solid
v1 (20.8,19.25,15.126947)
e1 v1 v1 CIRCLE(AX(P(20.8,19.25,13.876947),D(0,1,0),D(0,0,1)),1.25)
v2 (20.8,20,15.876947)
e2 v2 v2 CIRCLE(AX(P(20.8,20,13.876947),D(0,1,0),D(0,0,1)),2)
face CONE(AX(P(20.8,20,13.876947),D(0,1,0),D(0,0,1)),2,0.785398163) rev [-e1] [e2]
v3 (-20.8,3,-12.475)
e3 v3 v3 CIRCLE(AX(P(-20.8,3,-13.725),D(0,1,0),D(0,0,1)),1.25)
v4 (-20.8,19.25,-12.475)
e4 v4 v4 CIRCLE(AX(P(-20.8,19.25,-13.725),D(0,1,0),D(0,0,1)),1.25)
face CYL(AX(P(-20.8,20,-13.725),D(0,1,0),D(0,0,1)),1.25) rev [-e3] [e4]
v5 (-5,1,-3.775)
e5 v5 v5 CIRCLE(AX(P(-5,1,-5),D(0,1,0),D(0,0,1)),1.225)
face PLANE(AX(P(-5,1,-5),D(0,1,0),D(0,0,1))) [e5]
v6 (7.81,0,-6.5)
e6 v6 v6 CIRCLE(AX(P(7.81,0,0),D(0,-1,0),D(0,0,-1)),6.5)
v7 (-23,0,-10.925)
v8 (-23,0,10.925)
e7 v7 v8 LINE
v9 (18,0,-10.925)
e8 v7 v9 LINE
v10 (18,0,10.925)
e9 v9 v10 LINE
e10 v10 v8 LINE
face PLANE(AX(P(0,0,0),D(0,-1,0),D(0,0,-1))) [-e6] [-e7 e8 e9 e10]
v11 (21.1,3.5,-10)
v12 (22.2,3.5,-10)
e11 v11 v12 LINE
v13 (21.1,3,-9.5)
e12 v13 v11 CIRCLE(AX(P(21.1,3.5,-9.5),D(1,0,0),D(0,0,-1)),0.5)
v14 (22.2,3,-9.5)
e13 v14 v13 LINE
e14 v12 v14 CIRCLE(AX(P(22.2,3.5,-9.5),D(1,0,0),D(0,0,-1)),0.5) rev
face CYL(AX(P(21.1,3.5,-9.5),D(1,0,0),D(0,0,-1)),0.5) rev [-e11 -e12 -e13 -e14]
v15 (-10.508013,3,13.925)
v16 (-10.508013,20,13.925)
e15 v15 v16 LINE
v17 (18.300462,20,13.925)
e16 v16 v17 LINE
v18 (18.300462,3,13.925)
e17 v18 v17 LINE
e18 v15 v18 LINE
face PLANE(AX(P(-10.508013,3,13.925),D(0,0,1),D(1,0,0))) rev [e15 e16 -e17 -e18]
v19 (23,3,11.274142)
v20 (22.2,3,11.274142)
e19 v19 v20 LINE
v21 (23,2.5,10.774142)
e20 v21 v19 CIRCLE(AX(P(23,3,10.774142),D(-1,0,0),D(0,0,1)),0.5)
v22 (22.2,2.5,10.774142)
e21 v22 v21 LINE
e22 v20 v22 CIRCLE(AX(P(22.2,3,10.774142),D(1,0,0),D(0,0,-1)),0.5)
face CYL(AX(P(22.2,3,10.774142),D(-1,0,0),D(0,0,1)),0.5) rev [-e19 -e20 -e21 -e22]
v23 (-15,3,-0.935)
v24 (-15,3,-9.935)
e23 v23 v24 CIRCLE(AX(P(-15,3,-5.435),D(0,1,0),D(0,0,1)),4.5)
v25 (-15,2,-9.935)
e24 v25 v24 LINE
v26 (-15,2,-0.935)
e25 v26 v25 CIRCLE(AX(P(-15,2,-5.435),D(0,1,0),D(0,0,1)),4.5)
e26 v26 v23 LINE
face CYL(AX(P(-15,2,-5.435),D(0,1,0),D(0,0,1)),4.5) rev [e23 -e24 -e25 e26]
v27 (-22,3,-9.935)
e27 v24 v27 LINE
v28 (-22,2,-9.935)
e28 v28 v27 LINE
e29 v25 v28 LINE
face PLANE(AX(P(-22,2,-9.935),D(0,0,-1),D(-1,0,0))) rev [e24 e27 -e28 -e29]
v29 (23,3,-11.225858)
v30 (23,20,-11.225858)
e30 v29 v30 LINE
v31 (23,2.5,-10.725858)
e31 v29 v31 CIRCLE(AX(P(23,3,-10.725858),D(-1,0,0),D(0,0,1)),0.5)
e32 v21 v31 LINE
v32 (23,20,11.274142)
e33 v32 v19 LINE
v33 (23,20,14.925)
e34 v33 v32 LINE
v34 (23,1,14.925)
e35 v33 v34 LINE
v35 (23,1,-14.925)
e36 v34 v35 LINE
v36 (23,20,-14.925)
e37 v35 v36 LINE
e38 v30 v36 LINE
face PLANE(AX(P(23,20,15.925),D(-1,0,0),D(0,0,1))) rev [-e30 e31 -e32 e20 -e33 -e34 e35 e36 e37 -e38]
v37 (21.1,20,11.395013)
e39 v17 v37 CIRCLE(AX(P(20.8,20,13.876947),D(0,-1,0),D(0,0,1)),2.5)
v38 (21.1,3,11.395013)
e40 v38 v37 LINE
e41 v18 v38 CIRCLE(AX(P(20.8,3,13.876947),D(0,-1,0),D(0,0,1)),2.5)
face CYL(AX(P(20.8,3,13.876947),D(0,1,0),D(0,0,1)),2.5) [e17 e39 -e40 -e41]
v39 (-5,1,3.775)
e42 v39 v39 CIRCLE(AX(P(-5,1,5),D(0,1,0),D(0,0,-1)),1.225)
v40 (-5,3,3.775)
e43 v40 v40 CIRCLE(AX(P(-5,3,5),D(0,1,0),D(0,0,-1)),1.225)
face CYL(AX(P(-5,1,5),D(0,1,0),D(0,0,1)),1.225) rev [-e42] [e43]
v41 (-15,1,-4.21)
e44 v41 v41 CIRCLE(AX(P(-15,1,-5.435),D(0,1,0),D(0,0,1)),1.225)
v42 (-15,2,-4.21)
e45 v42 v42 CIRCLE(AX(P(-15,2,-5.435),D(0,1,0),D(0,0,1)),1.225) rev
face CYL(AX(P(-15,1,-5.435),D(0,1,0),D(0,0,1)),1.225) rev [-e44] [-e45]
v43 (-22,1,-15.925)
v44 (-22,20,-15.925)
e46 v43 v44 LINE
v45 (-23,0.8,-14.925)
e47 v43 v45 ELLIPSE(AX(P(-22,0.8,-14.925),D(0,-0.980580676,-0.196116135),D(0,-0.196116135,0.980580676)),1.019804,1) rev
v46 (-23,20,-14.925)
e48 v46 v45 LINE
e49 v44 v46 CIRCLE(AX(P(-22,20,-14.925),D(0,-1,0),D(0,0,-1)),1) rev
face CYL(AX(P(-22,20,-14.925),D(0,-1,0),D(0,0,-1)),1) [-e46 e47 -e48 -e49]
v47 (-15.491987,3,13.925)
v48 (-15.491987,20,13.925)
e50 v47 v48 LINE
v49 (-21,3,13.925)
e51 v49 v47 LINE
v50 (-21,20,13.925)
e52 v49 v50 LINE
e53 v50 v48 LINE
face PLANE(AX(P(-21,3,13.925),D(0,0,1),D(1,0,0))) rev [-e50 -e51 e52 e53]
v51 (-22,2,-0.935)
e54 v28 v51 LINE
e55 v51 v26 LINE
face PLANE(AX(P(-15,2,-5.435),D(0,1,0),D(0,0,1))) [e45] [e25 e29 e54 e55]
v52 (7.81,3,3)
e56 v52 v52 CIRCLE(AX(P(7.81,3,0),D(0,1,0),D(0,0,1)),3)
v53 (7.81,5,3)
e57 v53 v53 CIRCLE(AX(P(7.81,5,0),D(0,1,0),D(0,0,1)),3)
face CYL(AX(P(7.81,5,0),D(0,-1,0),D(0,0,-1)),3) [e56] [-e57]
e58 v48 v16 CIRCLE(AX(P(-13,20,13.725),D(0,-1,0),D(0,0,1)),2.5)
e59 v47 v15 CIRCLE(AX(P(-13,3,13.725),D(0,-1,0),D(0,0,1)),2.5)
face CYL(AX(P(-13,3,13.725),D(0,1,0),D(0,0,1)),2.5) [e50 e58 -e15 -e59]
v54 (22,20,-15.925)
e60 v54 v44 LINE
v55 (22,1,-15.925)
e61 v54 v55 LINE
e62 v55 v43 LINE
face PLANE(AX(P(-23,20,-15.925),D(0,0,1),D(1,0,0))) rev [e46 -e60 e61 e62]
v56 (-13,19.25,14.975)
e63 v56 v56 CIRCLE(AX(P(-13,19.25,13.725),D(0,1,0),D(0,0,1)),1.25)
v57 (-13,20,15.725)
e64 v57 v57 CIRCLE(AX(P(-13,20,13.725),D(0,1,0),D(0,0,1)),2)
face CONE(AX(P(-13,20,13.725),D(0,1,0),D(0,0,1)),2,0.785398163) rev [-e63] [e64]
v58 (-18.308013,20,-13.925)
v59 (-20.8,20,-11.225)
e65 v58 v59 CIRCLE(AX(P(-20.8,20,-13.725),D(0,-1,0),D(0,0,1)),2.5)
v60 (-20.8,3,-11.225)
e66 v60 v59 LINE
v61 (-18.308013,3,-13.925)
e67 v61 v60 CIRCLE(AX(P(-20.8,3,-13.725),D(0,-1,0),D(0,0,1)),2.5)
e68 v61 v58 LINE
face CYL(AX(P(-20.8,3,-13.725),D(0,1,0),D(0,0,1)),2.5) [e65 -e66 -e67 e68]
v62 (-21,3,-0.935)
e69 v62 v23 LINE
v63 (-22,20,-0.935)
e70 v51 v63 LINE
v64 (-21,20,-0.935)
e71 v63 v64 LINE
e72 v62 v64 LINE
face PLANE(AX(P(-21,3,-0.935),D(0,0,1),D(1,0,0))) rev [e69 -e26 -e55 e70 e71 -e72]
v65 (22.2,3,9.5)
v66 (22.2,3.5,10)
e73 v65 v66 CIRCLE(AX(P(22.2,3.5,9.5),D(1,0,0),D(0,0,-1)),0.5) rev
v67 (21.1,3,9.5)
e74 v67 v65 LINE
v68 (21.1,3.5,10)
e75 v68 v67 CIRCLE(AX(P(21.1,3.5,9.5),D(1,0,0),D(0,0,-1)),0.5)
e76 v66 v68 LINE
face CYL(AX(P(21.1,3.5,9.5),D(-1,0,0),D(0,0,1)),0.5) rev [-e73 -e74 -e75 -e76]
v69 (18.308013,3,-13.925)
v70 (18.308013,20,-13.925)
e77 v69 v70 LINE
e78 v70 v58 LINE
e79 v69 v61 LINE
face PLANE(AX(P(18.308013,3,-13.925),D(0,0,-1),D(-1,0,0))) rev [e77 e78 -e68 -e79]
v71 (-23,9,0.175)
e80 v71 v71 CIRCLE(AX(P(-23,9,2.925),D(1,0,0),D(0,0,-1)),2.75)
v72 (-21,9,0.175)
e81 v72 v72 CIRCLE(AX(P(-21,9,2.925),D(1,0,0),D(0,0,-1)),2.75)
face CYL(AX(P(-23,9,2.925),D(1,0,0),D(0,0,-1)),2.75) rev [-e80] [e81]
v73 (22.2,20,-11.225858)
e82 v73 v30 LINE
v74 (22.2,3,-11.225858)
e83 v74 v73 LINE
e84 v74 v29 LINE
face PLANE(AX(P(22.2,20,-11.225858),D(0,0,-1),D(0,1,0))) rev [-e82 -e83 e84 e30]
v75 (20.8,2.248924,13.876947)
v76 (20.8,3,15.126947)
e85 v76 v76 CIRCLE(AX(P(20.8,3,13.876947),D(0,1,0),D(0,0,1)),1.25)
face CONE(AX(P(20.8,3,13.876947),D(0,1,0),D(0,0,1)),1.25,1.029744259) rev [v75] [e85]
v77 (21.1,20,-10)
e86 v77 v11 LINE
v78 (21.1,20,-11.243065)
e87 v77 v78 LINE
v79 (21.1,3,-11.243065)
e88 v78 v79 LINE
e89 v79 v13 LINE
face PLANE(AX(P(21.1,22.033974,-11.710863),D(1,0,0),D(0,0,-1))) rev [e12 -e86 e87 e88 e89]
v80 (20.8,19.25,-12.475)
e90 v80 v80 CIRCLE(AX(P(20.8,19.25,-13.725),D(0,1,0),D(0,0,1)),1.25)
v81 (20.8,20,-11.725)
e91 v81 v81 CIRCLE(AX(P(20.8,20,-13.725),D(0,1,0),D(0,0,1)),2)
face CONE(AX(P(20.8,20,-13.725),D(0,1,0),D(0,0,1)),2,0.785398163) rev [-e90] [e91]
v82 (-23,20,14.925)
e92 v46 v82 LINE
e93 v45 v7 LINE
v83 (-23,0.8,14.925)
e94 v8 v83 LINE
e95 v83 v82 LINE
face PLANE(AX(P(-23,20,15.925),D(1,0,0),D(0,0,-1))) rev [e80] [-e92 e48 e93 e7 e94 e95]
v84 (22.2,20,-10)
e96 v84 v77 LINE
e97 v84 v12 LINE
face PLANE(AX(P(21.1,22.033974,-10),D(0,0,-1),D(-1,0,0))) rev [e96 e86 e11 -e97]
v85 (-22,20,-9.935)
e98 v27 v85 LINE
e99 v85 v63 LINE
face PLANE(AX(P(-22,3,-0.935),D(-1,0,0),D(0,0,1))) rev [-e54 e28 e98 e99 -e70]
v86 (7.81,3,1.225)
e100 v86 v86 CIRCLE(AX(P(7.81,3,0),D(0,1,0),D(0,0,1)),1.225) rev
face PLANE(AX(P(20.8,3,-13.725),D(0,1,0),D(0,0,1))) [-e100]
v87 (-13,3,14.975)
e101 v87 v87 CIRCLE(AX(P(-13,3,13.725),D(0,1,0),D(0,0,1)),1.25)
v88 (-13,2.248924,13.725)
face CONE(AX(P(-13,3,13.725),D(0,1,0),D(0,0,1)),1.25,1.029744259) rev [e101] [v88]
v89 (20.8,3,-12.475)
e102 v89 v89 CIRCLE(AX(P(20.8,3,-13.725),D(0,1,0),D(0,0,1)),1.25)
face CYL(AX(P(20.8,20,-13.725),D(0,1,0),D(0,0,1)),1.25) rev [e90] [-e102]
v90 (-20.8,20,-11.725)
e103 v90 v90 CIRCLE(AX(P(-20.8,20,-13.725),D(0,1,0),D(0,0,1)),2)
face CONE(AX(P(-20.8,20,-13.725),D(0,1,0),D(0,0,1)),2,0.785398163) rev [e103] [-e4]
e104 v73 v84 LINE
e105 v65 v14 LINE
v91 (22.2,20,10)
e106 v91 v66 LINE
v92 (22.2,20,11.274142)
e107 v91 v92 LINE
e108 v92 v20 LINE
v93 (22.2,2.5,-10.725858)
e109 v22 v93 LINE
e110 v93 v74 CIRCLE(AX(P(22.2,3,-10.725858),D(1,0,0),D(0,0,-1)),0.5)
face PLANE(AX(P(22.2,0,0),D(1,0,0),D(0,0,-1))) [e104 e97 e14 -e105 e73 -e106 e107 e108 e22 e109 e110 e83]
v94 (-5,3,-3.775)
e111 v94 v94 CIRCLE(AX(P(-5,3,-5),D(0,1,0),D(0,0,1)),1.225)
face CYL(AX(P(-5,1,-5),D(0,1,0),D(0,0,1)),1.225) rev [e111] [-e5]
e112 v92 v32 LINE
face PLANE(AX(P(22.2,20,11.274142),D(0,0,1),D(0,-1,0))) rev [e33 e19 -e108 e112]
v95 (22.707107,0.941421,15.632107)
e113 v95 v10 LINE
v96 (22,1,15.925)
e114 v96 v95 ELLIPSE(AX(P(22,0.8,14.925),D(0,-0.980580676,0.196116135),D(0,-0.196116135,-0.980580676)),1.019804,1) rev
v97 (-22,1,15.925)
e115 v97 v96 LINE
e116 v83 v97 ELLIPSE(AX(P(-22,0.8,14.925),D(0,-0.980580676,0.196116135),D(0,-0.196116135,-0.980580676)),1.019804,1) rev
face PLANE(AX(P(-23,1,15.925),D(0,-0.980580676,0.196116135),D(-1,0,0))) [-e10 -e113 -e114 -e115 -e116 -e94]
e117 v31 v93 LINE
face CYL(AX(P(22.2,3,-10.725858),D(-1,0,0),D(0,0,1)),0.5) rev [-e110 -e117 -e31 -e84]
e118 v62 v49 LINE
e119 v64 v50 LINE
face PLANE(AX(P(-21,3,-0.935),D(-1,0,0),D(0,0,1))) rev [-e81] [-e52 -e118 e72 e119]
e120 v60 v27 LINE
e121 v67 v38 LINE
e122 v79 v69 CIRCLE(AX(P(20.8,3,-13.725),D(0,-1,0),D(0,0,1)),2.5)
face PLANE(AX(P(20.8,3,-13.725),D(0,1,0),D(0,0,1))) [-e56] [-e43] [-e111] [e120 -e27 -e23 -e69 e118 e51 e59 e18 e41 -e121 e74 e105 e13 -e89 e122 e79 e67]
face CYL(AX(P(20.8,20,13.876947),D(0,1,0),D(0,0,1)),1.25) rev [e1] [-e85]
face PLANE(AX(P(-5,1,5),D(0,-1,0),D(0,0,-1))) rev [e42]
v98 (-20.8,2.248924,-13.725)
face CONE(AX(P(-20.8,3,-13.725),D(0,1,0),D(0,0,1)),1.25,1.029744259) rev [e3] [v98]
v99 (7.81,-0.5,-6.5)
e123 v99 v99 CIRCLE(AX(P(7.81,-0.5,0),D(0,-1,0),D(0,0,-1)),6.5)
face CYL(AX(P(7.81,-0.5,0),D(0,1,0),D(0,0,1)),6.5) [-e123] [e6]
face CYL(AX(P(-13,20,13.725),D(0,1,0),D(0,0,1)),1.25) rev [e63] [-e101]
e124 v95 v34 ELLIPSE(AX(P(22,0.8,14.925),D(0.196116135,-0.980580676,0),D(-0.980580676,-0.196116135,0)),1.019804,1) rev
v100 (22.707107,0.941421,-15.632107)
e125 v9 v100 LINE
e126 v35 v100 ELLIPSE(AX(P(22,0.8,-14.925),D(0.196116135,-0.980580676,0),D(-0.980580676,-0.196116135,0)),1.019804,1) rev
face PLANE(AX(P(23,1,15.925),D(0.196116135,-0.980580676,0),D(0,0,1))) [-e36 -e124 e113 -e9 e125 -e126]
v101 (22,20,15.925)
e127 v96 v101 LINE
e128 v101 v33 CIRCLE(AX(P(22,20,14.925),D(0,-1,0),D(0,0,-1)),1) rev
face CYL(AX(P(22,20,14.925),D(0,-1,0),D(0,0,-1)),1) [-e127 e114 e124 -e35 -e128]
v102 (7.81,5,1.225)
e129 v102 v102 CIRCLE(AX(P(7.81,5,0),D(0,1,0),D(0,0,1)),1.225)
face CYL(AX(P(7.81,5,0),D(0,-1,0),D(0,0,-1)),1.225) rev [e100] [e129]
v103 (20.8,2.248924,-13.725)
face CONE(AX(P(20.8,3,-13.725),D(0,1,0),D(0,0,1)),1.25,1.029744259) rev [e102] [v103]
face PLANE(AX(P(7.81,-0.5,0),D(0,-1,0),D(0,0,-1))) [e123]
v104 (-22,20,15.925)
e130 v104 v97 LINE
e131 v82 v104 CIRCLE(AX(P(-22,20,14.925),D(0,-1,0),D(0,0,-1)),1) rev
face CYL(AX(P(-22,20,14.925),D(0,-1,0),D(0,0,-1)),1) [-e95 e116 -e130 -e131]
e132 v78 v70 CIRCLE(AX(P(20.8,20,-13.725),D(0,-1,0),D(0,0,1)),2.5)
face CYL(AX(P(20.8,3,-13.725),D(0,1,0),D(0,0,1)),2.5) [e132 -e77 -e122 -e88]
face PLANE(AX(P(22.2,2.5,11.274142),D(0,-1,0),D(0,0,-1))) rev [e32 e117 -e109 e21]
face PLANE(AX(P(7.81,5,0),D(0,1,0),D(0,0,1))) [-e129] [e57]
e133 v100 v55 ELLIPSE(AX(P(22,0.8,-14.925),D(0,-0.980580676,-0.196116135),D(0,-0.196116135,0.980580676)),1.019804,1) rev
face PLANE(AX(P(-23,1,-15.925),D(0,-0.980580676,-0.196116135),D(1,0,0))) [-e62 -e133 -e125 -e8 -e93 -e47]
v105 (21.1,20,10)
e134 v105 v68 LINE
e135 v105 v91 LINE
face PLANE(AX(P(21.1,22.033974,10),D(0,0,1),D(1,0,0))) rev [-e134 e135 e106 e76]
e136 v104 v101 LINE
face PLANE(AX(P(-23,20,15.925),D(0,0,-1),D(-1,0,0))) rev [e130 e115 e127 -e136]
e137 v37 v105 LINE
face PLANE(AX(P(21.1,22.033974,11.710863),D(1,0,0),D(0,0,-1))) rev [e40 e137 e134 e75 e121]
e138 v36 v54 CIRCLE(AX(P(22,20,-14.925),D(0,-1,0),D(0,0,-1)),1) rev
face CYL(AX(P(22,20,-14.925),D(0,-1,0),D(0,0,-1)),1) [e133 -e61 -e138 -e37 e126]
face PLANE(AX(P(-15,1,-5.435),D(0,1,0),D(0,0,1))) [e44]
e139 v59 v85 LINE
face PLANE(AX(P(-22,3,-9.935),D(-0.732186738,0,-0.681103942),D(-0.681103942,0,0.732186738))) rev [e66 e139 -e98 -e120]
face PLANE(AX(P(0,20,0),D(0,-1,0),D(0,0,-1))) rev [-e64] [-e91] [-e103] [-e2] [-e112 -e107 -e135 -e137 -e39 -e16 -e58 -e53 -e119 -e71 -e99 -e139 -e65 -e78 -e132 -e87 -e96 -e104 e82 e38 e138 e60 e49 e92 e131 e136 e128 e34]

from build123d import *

# Parameters (mm, degrees)
SKETCH1_W                                            = 46
SKETCH1_H                                            = 31.85
BOSS_EXTRUDE1_DEPTH                                  = 20
CSK_FOR_M6_HEX_SOCKET_COUNTERSUNK_CAP_SC_D           = 2.5
CSK_FOR_M6_HEX_SOCKET_COUNTERSUNK_CAP_SC_DEPTH       = 17
CSK_FOR_M6_HEX_SOCKET_COUNTERSUNK_CAP_SC_CSINK_D     = 4
CSK_FOR_M6_HEX_SOCKET_COUNTERSUNK_CAP_SC_CSINK_ANGLE = 90
CSK_FOR_M6_HEX_SOCKET_COUNTERSUNK_CAP_SC_TIP         = 0.751075774
CUT_EXTRUDE1_DEPTH                                   = 17
SKETCH9_W                                            = 22.5
SKETCH9_H                                            = 17.5
CUT_EXTRUDE2_DEPTH                                   = 0.8
FILLET1_R                                            = 1
CHAMFER3_SIZE                                        = 5
CHAMFER3_SIZE_2                                      = 1
CHAMFER4_SIZE                                        = 5
CHAMFER4_SIZE_2                                      = 1
SKETCH15_W                                           = 1.1
SKETCH15_H                                           = 1.710862934
BOSS_EXTRUDE2_DEPTH                                  = 17
FILLET2_R                                            = 0.5
SKETCH16_R                                           = 1.225
CUT_EXTRUDE5_DEPTH                                   = 2
CUT_EXTRUDE6_DEPTH                                   = 1
SKETCH18_R                                           = 3
SKETCH18_R_2                                         = 1.225
BOSS_EXTRUDE3_DEPTH                                  = 2
SKETCH19_R                                           = 2.75
CUT_EXTRUDE7_DEPTH                                   = 51.888167829
SKETCH20_R                                           = 6.5
BOSS_EXTRUDE4_DEPTH                                  = 0.5


with BuildPart() as part:
    # Sketch1 → Boss-Extrude1 (new body)
    with BuildSketch(Plane(origin=(0, 0, 0), x_dir=(1, 0, 0), z_dir=(0, 1, 0))):
        Rectangle(SKETCH1_W, SKETCH1_H)
    extrude(amount=BOSS_EXTRUDE1_DEPTH)

    # CSK for M6 Hex Socket Countersunk Cap Screw1
    with Locations(Plane(origin=(0, 20, 0), x_dir=(1, 0, 0), z_dir=(0, 1, 0))):
        with Locations((-20.8, 13.725), (-13, -13.725), (20.8, 13.725), (20.8, -13.876947284)):
            CounterSinkHole(CSK_FOR_M6_HEX_SOCKET_COUNTERSUNK_CAP_SC_D / 2, CSK_FOR_M6_HEX_SOCKET_COUNTERSUNK_CAP_SC_CSINK_D / 2, depth=CSK_FOR_M6_HEX_SOCKET_COUNTERSUNK_CAP_SC_DEPTH, counter_sink_angle=CSK_FOR_M6_HEX_SOCKET_COUNTERSUNK_CAP_SC_CSINK_ANGLE)
            with Locations((0, 0, -(CSK_FOR_M6_HEX_SOCKET_COUNTERSUNK_CAP_SC_DEPTH + CSK_FOR_M6_HEX_SOCKET_COUNTERSUNK_CAP_SC_TIP / 2))):  # 118° drill point
                Cone(0, CSK_FOR_M6_HEX_SOCKET_COUNTERSUNK_CAP_SC_D / 2, CSK_FOR_M6_HEX_SOCKET_COUNTERSUNK_CAP_SC_TIP, mode=Mode.SUBTRACT)

    # Sketch8 → Cut-Extrude1 (cut)
    with BuildSketch(Plane(origin=(0, 20, 0), x_dir=(1, 0, 0), z_dir=(0, 1, 0))):
        with BuildLine():
            Line((-21, 0.935), (-22, 0.935))
            Line((-22, 0.935), (-22, 9.935))
            Line((-22, 9.935), (-20.8, 11.225))
            ThreePointArc((-20.8, 11.225), (-18.962882693, 12.029417504), (-18.308012841, 13.925))
            Line((-18.308012841, 13.925), (18.308012841, 13.925))
            ThreePointArc((18.308012841, 13.925), (19.142606811, 11.853356921), (21.3, 11.275510257))
            Line((21.3, 11.275510257), (22.2, 11.225))
            Line((22.2, 11.225), (22.2, -11.427457541))
            Line((22.2, -11.427457541), (21.3, -11.427457541))
            ThreePointArc((21.3, -11.427457541), (19.200322601, -11.955741356), (18.300461855, -13.925))
            Line((18.300461855, -13.925), (-10.508012841, -13.925))
            ThreePointArc((-10.508012841, -13.925), (-13, -11.225), (-15.491987159, -13.925))
            Line((-15.491987159, -13.925), (-21, -13.925))
            Line((-21, -13.925), (-21, 0.935))
        make_face()
    extrude(amount=-CUT_EXTRUDE1_DEPTH, mode=Mode.SUBTRACT)

    # Sketch9 → Cut-Extrude2 (cut)
    with BuildSketch(Plane(origin=(23, 0, 0), x_dir=(0, 0, -1), z_dir=(1, 0, 0))):
        with Locations((-0.02414151, 11.25)):
            Rectangle(SKETCH9_W, SKETCH9_H)
    extrude(amount=-CUT_EXTRUDE2_DEPTH, mode=Mode.SUBTRACT)

    # Fillet1
    fillet1_edges = [part.edges().sort_by_distance(p)[0] for p in [
        (23, 10, 15.925),
        (-23, 10, 15.925),
        (-23, 10, -15.925),
        (23, 10, -15.925),
    ]]
    fillet(fillet1_edges, radius=FILLET1_R)

    # Chamfer3
    # the kernel refuses this chamfer: 5, 1 mm, written as the material it takes off along each edge
    with BuildSketch(Plane(origin=(23, 0, 27.915660431), x_dir=(-0.9999715107910817, -0.007548351224040629, 0), z_dir=(0, 0, -1))) as chamfer3_piece_1:
        Polygon((CHAMFER3_SIZE * 0.999971510791, CHAMFER3_SIZE * 0.00754835122404), (-CHAMFER3_SIZE_2 * 0.00754835122404, CHAMFER3_SIZE_2 * 0.999971510791), (0, 0), align=None)
    extrude(amount=55.831320863, mode=Mode.SUBTRACT)

    # Chamfer4
    # the kernel refuses this chamfer: 5, 1 mm, written as the material it takes off along each edge
    with BuildSketch(Plane(origin=(30.990660431, 0, -15.925), x_dir=(0, -0.007548351224040629, 0.9999715107910817), z_dir=(-1, 0, 0))) as chamfer4_piece_1:
        Polygon((CHAMFER4_SIZE * 0.999971510791, CHAMFER4_SIZE * 0.00754835122404), (-CHAMFER4_SIZE_2 * 0.00754835122404, CHAMFER4_SIZE_2 * 0.999971510791), (0, 0), align=None)
    extrude(amount=65.981320863, mode=Mode.SUBTRACT)
    with BuildSketch(Plane(origin=(-34.990660431, 0, 15.925), x_dir=(0, 0.9826554028509425, 0.18544098588999117), z_dir=(1, 0, 0))) as chamfer4_piece_2:
        Polygon((CHAMFER4_SIZE_2 * 0.982655402851, -CHAMFER4_SIZE_2 * 0.18544098589), (-CHAMFER4_SIZE * 0.18544098589, -CHAMFER4_SIZE * 0.982655402851), (0, 0), align=None)
    extrude(amount=65.981320863, mode=Mode.SUBTRACT)

    # Sketch15 → Boss-Extrude2 (add)
    with BuildSketch(Plane(origin=(0, 3, 0), x_dir=(1, 0, 0), z_dir=(0, 1, 0))):
        with Locations((21.65, 10.855431467)):
            Rectangle(SKETCH15_W, SKETCH15_H)
        with Locations((21.65, -10.855431467)):
            Rectangle(SKETCH15_W, SKETCH15_H)
    extrude(amount=BOSS_EXTRUDE2_DEPTH)

    # Fillet2
    fillet2_edges = [part.edges().sort_by_distance(p)[0] for p in [
        (21.65, 3, -10),
        (21.65, 3, 10),
        (22.6, 2.5, 11.27414151),
        (22.6, 2.5, -11.22585849),
    ]]
    fillet(fillet2_edges, radius=FILLET2_R)

    # Sketch16 → Cut-Extrude5 (cut)
    with BuildSketch(Plane(origin=(0, 3, 0), x_dir=(1, 0, 0), z_dir=(0, 1, 0))):
        with Locations(Location((-15, 5.435, 0), (0, 0, 270))):
            Circle(SKETCH16_R)
        with Locations(Location((-5, 5, 0), (0, 0, 270))):
            Circle(SKETCH16_R)
        with Locations(Location((-5, -5, 0), (0, 0, 90))):
            Circle(SKETCH16_R)
    extrude(amount=-CUT_EXTRUDE5_DEPTH, mode=Mode.SUBTRACT)

    # Sketch17 → Cut-Extrude6 (cut)
    with BuildSketch(Plane(origin=(0, 3, 0), x_dir=(1, 0, 0), z_dir=(0, 1, 0))):
        with BuildLine():
            Line((-22, 0.935), (-22, 9.935))
            Line((-22, 9.935), (-15, 9.935))
            ThreePointArc((-15, 9.935), (-10.5, 5.435), (-15, 0.935))
            Line((-15, 0.935), (-22, 0.935))
        make_face()
    extrude(amount=-CUT_EXTRUDE6_DEPTH, mode=Mode.SUBTRACT)

    # Sketch18 → Boss-Extrude3 (add)
    with BuildSketch(Plane(origin=(0, 3, 0), x_dir=(1, 0, 0), z_dir=(0, 1, 0))):
        with Locations(Location((7.81, 0, 0), (0, 0, 270))):
            Circle(SKETCH18_R)
        with Locations(Location((7.81, 0, 0), (0, 0, 270))):
            Circle(SKETCH18_R_2, mode=Mode.SUBTRACT)
    extrude(amount=BOSS_EXTRUDE3_DEPTH)

    # Sketch19 → Cut-Extrude7 (cut, through all)
    with BuildSketch(Plane(origin=(-21, 0, 0), x_dir=(0, 0, -1), z_dir=(1, 0, 0))):
        with Locations((-2.925, 9)):
            Circle(SKETCH19_R)
    extrude(amount=-CUT_EXTRUDE7_DEPTH, mode=Mode.SUBTRACT)

    # Sketch20 → Boss-Extrude4 (add)
    with BuildSketch(Plane.XZ):
        with Locations(Location((7.81, 0, 0), (0, 0, 270))):
            Circle(SKETCH20_R)
    extrude(amount=BOSS_EXTRUDE4_DEPTH)


solid = part.part
